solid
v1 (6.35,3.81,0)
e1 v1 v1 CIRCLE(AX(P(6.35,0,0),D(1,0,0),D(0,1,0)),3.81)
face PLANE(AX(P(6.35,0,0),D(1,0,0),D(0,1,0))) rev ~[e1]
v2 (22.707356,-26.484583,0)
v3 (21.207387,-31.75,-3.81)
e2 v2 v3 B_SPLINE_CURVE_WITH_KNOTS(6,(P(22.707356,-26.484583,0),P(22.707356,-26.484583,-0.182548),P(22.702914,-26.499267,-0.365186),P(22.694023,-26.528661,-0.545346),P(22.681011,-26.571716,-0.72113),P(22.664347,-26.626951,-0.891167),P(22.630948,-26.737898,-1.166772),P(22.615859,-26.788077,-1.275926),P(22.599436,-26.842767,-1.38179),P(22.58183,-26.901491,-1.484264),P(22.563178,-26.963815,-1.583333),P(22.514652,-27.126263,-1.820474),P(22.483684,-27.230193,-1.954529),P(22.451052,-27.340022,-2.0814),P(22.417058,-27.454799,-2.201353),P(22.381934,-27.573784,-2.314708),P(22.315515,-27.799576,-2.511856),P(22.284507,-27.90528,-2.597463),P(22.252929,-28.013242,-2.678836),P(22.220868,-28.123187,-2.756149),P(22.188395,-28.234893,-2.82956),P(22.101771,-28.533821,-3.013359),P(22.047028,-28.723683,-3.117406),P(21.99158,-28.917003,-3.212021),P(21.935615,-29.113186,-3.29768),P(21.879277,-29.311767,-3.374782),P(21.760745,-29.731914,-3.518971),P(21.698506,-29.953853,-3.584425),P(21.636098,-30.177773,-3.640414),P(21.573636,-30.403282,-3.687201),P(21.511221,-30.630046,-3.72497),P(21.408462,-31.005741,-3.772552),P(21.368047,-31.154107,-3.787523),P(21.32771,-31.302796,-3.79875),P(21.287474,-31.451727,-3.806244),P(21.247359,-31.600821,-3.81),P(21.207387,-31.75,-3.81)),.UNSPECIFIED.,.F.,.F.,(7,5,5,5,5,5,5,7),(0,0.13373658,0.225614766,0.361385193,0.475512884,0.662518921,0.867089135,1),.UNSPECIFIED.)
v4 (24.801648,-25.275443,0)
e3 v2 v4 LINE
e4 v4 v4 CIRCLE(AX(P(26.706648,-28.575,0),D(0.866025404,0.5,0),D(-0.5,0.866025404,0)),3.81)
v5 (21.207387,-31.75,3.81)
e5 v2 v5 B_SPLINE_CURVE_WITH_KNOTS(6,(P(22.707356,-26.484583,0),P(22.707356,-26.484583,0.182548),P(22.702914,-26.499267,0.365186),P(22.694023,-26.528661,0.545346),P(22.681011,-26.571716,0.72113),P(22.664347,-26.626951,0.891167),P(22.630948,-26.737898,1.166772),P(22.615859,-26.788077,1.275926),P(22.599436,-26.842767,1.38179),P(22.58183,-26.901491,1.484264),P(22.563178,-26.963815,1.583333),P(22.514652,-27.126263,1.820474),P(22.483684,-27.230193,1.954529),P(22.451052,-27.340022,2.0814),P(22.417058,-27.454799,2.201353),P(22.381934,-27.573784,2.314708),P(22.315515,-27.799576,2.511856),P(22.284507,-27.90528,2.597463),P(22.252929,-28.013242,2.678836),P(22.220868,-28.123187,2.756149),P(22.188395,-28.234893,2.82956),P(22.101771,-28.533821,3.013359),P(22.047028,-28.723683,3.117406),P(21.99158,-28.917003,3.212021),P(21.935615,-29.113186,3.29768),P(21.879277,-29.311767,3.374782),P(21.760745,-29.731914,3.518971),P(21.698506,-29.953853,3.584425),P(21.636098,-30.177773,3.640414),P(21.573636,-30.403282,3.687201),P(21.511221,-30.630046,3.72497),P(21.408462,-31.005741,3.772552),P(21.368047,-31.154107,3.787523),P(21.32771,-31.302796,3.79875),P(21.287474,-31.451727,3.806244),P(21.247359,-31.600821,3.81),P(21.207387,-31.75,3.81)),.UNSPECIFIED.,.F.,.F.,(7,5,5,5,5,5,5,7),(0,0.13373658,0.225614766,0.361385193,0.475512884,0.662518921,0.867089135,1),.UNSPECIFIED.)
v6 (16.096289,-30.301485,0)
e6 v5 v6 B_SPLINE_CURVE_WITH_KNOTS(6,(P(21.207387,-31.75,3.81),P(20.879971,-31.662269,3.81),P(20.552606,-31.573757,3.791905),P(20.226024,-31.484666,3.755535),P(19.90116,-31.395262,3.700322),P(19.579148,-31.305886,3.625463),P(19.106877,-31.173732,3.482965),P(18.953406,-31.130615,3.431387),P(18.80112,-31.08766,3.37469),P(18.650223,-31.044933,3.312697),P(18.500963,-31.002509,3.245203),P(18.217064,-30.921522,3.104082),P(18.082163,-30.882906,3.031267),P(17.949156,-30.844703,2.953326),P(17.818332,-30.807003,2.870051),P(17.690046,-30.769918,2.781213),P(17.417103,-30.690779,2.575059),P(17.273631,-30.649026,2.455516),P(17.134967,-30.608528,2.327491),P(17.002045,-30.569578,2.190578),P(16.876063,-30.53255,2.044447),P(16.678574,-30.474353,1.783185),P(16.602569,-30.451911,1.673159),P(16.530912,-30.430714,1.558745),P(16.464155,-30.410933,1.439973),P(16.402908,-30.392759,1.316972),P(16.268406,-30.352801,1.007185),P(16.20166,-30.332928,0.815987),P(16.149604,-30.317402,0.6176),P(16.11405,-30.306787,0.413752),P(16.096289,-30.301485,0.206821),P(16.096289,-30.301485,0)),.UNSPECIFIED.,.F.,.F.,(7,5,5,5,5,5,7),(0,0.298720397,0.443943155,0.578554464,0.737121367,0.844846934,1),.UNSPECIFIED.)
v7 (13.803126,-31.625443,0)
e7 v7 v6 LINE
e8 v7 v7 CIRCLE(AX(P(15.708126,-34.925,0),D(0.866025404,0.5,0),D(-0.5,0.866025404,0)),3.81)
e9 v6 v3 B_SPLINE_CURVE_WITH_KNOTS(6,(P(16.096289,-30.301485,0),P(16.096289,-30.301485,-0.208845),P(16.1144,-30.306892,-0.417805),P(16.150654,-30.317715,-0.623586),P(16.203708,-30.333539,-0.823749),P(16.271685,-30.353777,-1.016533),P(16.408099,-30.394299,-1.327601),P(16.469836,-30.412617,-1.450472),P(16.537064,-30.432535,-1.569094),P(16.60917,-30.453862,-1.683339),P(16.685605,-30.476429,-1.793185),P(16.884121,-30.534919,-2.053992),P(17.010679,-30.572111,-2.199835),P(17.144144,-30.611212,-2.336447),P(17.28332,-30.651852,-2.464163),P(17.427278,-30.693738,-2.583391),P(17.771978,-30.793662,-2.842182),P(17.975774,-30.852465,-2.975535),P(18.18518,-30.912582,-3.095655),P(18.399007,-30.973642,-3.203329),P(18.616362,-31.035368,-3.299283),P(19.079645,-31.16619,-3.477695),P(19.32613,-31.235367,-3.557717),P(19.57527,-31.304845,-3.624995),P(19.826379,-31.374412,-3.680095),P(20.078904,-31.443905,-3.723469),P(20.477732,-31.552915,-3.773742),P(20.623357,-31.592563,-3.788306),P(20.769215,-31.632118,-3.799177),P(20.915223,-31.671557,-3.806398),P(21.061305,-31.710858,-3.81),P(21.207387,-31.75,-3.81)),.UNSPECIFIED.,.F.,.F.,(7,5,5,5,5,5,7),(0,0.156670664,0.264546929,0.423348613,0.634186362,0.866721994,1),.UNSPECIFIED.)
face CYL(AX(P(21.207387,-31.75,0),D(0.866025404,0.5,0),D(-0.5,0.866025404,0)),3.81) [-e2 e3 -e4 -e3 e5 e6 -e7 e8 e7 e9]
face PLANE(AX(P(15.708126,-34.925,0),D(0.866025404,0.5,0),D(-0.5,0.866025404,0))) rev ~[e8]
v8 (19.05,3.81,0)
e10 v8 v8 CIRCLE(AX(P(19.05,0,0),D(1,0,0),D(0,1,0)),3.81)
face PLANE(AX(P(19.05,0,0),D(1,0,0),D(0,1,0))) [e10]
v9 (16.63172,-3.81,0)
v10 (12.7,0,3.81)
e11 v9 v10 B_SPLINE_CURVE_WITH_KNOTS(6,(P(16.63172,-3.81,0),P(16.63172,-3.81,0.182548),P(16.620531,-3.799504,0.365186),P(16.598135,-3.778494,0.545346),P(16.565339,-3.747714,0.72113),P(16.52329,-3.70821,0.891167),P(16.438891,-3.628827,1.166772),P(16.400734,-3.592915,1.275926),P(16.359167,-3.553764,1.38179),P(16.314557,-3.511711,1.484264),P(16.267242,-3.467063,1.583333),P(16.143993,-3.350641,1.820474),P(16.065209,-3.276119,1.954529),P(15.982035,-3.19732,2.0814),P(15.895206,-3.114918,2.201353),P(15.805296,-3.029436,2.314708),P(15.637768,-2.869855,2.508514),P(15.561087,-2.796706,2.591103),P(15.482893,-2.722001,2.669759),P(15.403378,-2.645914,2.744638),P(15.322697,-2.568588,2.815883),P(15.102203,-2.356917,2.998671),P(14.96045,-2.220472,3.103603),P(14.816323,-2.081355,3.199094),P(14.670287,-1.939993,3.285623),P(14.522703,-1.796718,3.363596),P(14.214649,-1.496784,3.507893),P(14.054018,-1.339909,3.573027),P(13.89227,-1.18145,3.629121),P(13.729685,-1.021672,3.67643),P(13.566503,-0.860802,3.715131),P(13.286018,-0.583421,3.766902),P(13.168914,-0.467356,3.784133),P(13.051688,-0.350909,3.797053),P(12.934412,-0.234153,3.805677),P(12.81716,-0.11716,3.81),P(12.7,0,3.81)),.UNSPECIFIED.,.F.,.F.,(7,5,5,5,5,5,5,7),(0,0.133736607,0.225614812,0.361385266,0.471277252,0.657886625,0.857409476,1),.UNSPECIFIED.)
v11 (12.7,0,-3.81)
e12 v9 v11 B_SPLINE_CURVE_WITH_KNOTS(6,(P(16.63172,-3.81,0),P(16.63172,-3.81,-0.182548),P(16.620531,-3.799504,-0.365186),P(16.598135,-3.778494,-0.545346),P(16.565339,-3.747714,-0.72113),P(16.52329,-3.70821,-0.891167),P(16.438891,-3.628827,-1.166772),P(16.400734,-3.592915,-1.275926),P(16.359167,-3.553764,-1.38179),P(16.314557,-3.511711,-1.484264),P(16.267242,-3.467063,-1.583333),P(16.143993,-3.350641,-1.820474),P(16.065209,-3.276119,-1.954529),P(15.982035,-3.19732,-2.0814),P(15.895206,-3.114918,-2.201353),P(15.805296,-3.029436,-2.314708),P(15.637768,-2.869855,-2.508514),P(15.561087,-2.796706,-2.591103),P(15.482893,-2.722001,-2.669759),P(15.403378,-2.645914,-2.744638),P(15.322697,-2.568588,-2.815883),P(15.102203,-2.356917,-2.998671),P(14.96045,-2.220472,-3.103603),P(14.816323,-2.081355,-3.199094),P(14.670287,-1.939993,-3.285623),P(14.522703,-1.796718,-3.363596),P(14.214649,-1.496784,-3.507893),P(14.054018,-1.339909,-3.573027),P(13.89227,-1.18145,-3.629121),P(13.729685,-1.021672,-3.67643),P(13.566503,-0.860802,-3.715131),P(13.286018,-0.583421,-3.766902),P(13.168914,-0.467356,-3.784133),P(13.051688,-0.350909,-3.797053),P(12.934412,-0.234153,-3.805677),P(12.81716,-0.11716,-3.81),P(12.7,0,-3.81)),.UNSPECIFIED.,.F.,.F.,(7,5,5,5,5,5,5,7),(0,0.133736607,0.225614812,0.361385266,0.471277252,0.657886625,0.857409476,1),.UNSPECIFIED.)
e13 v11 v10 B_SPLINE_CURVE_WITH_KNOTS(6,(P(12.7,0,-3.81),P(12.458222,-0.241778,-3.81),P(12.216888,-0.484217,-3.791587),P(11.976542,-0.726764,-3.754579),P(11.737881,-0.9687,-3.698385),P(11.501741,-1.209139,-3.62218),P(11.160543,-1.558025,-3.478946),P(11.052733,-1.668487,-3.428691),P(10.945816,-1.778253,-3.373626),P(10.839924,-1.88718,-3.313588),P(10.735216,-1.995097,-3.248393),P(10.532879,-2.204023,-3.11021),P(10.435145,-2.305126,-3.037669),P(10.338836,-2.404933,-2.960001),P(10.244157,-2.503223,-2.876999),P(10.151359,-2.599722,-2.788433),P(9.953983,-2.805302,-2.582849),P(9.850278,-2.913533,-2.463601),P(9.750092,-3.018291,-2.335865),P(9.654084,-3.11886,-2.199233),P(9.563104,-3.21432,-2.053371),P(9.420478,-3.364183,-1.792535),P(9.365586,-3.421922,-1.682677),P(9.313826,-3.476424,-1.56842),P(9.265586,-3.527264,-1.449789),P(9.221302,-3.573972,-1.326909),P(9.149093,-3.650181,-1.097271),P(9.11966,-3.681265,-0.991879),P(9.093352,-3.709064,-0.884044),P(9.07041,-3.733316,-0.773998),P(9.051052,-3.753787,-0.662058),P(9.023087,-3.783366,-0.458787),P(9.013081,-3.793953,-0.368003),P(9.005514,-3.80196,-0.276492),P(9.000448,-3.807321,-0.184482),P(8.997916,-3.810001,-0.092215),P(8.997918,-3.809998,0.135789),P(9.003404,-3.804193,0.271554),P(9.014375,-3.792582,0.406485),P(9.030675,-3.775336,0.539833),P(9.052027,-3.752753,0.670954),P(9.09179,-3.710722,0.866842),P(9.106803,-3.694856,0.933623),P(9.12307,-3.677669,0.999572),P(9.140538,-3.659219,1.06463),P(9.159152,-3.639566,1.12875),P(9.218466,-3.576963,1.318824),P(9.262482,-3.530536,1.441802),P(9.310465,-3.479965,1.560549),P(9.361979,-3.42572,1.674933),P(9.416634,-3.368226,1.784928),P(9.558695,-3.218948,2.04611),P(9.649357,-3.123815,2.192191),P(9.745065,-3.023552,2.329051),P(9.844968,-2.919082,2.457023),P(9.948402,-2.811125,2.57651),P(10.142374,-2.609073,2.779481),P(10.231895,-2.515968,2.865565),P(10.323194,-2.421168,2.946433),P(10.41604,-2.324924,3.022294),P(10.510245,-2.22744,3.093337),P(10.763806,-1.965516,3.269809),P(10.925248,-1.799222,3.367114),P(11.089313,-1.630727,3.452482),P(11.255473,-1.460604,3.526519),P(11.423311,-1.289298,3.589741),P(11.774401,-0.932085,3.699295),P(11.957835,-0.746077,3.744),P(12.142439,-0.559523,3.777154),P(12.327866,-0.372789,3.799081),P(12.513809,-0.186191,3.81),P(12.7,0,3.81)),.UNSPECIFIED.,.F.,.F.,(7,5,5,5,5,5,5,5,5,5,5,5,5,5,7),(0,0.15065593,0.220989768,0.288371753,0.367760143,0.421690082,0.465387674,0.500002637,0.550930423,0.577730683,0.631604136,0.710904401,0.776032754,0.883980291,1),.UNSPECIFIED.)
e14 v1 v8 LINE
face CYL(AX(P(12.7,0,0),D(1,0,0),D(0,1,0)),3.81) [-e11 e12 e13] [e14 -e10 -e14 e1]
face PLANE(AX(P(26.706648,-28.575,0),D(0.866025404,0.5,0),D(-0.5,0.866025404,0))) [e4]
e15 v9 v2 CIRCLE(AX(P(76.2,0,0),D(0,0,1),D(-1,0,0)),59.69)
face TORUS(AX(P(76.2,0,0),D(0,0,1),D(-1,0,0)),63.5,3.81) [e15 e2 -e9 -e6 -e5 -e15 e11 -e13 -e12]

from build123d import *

# Parameters (mm, degrees)
F0_R     = 3.81
F4_R     = 3.81
F5_DEPTH = 6.35
F8_R     = 3.81
F9_DEPTH = 6.35


with BuildPart() as f2:
    # F2: sweep along a path in F1
    with BuildLine(Plane.XY) as f2_path:
        ThreePointArc((0, 0), (2.5964520368, -19.7220112368), (10.2088642316, -38.1))
    # F0 (on Front) → F2 (sweep)
    with BuildSketch(Plane.XZ):
        with Locations((12.7, 0)):
            Circle(F0_R)
    sweep(path=f2_path.line)

    # F4 (on offset) → F5 (join, symmetric)
    with BuildSketch(Plane.YZ.offset(12.7)):
        Circle(F4_R)
    extrude(amount=F5_DEPTH, both=True)

    # F8 (on face) → F9 (join, symmetric)
    with BuildSketch(Plane(origin=(2.1573868597, 1.2455678842, 0), x_dir=(-0.5, 0.8660254038, 0), z_dir=(0.8660254038, 0.5, 0))):
        with Locations((-38.1, 0)):
            Circle(F8_R)
    extrude(amount=F9_DEPTH, both=True)


solid = f2.part
